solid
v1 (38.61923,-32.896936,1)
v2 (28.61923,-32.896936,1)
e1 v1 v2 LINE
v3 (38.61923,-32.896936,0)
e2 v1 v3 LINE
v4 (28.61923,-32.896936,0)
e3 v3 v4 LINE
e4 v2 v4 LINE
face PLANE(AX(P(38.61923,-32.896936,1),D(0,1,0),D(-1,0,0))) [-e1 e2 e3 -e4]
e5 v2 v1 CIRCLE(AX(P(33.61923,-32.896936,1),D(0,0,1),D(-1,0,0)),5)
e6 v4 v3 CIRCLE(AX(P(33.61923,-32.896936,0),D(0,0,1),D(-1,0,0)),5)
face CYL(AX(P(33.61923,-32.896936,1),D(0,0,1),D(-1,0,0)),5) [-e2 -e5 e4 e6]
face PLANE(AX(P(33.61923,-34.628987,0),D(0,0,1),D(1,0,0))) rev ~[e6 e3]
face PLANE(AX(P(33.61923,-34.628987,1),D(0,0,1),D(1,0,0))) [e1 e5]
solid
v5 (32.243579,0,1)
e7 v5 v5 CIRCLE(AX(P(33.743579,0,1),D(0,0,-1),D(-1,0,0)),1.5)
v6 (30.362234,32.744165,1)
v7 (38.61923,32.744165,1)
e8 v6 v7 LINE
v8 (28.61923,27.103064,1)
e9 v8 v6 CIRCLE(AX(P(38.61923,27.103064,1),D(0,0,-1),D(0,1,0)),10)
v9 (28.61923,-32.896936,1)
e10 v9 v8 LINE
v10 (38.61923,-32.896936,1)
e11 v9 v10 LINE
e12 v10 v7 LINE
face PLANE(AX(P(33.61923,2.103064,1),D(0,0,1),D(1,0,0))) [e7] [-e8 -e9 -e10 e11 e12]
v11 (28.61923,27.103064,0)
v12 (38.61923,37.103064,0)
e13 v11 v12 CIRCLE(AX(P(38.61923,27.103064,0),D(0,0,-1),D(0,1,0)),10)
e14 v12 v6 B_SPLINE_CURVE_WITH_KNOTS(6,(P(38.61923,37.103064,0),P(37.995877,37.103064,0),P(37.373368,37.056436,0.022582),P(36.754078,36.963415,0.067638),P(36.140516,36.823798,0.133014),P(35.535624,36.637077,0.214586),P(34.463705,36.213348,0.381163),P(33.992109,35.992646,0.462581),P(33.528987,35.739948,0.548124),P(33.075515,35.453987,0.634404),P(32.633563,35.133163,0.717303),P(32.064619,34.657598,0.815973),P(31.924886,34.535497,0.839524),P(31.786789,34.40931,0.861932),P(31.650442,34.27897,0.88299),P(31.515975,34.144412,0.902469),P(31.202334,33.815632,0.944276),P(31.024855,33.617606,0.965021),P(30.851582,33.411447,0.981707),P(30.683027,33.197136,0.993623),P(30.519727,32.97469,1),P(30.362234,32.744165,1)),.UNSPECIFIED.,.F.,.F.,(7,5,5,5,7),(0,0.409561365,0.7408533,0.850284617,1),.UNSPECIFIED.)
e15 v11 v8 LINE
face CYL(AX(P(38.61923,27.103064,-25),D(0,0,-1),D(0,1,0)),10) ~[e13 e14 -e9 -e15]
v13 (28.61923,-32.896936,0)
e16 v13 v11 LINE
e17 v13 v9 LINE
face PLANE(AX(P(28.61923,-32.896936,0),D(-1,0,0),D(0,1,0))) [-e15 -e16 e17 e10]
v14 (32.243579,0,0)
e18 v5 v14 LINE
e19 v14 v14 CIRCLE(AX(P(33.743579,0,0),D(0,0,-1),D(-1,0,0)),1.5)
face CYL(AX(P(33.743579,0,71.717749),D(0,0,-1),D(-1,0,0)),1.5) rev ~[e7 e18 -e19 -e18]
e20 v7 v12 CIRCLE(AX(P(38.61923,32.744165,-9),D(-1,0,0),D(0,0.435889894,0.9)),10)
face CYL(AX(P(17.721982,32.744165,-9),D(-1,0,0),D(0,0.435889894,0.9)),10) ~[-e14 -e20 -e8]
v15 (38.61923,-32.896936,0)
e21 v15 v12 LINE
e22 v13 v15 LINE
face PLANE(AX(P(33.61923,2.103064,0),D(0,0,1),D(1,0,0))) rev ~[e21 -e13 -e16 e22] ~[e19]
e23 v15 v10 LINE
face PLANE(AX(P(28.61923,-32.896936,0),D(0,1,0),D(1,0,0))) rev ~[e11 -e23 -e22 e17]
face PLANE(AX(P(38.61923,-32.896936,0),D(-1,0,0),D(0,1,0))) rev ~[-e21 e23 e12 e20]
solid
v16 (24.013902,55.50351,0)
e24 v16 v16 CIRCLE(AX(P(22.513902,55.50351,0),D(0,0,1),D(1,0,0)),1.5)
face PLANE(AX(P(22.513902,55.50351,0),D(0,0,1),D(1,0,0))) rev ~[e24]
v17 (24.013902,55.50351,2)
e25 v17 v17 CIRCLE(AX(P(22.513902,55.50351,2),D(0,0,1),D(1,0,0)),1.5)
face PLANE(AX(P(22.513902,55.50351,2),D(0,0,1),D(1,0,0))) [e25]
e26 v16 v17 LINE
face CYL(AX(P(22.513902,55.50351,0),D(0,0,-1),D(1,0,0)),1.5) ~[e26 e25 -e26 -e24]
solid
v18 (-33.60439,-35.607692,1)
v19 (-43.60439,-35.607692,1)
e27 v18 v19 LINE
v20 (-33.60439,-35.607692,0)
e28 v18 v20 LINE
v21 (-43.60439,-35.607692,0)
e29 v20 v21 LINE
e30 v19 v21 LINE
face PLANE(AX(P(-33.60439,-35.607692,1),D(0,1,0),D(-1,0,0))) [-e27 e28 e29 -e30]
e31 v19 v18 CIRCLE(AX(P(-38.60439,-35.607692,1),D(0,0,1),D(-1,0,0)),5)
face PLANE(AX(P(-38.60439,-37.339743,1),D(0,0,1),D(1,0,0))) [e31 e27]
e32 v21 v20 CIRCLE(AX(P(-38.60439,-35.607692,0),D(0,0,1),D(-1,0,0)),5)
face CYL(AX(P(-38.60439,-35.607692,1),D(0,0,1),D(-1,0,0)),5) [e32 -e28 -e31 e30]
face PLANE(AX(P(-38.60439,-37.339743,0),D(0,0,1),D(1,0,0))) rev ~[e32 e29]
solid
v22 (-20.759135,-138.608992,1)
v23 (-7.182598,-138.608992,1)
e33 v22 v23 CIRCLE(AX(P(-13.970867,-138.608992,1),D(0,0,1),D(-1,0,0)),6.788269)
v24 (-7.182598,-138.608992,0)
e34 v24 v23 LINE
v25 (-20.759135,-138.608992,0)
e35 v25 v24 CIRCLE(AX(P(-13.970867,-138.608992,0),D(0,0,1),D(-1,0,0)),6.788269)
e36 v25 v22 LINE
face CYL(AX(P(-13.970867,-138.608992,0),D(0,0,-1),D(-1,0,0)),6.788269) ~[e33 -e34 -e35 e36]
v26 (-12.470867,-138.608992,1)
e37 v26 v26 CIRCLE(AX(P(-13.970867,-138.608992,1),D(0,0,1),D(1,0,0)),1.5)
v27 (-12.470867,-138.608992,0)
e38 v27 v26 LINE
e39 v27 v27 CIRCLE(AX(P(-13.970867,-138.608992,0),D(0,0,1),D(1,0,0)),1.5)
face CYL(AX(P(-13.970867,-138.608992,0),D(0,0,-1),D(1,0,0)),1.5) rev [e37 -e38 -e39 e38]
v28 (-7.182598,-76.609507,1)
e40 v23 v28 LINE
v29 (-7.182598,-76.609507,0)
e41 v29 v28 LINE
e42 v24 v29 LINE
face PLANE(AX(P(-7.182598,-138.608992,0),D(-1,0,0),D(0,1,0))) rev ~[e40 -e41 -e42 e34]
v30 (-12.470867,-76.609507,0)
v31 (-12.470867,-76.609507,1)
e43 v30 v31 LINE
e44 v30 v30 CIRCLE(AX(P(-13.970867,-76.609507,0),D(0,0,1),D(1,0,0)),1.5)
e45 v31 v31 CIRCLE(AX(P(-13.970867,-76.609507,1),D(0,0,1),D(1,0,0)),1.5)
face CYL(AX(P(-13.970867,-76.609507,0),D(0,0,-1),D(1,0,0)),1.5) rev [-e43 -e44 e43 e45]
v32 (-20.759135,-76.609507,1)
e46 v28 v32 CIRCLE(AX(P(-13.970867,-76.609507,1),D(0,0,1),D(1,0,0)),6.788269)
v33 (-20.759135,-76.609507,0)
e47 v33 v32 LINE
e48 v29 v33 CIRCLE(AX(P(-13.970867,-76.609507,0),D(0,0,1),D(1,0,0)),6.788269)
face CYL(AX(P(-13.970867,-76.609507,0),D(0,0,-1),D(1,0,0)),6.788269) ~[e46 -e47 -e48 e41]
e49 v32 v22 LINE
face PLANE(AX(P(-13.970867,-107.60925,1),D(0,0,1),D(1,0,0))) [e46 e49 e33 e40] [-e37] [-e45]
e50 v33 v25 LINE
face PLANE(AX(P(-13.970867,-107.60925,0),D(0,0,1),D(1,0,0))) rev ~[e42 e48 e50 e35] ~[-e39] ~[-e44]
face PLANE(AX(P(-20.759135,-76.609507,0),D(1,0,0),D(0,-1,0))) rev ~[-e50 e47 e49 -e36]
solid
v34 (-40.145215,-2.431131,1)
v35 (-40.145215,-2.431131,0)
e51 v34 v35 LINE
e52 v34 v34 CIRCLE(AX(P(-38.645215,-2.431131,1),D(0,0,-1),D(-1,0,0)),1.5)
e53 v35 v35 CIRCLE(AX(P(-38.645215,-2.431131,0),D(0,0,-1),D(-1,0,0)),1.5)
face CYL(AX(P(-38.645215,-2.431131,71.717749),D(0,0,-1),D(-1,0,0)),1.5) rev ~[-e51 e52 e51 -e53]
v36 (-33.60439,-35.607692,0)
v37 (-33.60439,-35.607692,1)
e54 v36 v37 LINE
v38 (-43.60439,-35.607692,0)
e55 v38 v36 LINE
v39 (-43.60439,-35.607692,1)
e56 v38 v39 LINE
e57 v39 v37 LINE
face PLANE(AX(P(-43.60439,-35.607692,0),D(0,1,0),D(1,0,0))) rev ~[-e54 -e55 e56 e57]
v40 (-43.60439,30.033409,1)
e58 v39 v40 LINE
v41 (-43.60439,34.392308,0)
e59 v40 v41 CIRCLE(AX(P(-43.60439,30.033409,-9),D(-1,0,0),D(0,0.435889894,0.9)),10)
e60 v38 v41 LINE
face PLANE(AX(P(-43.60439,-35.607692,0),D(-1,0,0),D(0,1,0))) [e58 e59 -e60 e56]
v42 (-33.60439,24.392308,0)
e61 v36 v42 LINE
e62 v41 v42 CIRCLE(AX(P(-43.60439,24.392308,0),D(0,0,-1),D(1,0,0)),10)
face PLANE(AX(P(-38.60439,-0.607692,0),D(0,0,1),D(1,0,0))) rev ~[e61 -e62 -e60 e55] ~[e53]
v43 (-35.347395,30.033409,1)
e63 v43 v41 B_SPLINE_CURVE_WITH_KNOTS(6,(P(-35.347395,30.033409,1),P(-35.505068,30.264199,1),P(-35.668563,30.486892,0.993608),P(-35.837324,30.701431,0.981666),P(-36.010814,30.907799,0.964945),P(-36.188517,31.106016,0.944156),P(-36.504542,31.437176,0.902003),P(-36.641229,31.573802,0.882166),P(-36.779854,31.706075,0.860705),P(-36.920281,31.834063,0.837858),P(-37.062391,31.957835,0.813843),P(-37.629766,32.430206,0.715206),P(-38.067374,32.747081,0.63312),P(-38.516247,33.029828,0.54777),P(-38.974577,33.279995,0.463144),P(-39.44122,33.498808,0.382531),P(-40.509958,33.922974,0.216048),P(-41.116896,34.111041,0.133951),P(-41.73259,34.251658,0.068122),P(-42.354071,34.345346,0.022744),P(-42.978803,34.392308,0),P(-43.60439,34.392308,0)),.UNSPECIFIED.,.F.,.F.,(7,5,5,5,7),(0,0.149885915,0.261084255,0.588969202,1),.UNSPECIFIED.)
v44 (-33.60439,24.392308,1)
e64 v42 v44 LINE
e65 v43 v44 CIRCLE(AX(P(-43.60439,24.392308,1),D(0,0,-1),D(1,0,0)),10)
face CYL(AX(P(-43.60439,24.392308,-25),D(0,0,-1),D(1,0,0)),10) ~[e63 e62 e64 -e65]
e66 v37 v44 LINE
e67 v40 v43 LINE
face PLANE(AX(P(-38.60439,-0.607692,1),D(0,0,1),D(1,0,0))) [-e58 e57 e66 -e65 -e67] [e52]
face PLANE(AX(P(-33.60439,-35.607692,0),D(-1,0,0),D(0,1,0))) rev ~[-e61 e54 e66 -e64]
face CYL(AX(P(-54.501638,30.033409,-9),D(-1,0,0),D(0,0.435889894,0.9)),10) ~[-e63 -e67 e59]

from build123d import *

# Parameters (mm, degrees)
F0_W        = 10
F0_H        = 70
F1_DEPTH    = 1
F2_T1_DEPTH = 51
F2_T3_DEPTH = 31.7944947177
F3_W        = 10
F3_H        = 70
F4_DEPTH    = 1
F5_T1_DEPTH = 51
F5_T3_DEPTH = 31.7944947177
F7_D        = 3
F10_D       = 3
F11_R       = 1.5
F12_DEPTH   = 2
F13_R       = 1.5
F14_DEPTH   = 1
F15_DEPTH   = 1
F16_DEPTH   = 1


# Not quite as in the source:
# - a fillet or chamfer that OpenCascade refuses, or shapes differently, is made with other operations: its cross-section is extruded or revolved along the edge and cut away or added


with BuildPart() as f1:
    # F0 (on Top) → F1 (new body)
    with BuildSketch(Plane.XY):
        with Locations((-38.6043904229, -0.6076917052)):
            Rectangle(F0_W, F0_H)
    extrude(amount=F1_DEPTH)

    # F2: fillet of radius 10 on 2 edges, made by hand

    # F2_s2 → F2_t1 (cut)
    with BuildSketch(Plane.XY.offset(-25)):
        with BuildLine():
            ThreePointArc((-33.6043904229, 24.3923082948), (-36.5333226111, 31.4633761066), (-43.6043904229, 34.3923082948))
            Line((-43.6043904229, 34.3923082948), (-33.6043904229, 34.3923082948))
            Line((-33.6043904229, 34.3923082948), (-33.6043904229, 24.3923082948))
        make_face()
    extrude(amount=F2_T1_DEPTH, mode=Mode.SUBTRACT)

    # F2_s4 → F2_t3 (cut)
    with BuildSketch(Plane.YZ.offset(-54.5016377818)):
        with BuildLine():
            ThreePointArc((34.3923082948, 0), (32.2694773287, 0.7467943448), (30.0334093512, 1))
            Line((30.0334093512, 1), (34.3923082948, 1))
            Line((34.3923082948, 1), (34.3923082948, 0))
        make_face()
    extrude(amount=F2_T3_DEPTH, mode=Mode.SUBTRACT)

    # F10 (through all)
    with Locations(Plane.XY.offset(1)):
        with Locations((-38.6452153325, -2.4311314337)):
            Hole(F10_D / 2)


with BuildPart() as f4:
    # F3 (on Top) → F4 (new body)
    with BuildSketch(Plane.XY):
        with Locations((33.6192296806, 2.1030642092)):
            Rectangle(F3_W, F3_H)
    extrude(amount=F4_DEPTH)

    # F5: fillet of radius 10 on 2 edges, made by hand

    # F5_s2 → F5_t1 (cut)
    with BuildSketch(Plane.XY.offset(-25)):
        with BuildLine():
            ThreePointArc((38.6192296806, 37.1030642092), (31.5481618688, 34.1741320211), (28.6192296806, 27.1030642092))
            Line((28.6192296806, 27.1030642092), (28.6192296806, 37.1030642092))
            Line((28.6192296806, 37.1030642092), (38.6192296806, 37.1030642092))
        make_face()
    extrude(amount=F5_T1_DEPTH, mode=Mode.SUBTRACT)

    # F5_s4 → F5_t3 (cut)
    with BuildSketch(Plane.YZ.offset(17.7219823218)):
        with BuildLine():
            ThreePointArc((37.1030642092, 0), (34.9802332432, 0.7467943448), (32.7441652657, 1))
            Line((32.7441652657, 1), (37.1030642092, 1))
            Line((37.1030642092, 1), (37.1030642092, 0))
        make_face()
    extrude(amount=F5_T3_DEPTH, mode=Mode.SUBTRACT)

    # F7 (through all)
    with Locations(Plane.XY.offset(1)):
        with Locations((33.7435789406, 0)):
            Hole(F7_D / 2)


with BuildPart() as f12:
    # F11 (on Top) → F12 (new body)
    with BuildSketch(Plane.XY):
        with Locations((22.5139018148, 55.5035099387)):
            Circle(F11_R)
    extrude(amount=F12_DEPTH)


with BuildPart() as f14:
    # F13 (on Top) → F14 (new body)
    with BuildSketch(Plane.XY):
        with BuildLine():
            ThreePointArc((-7.182598114, -76.6095072031), (-13.9708667994, -69.8212385178), (-20.7591354847, -76.6095072031))
            Line((-20.7591354847, -76.6095072031), (-20.7591354847, -138.6089920998))
            ThreePointArc((-20.7591354847, -138.6089920998), (-13.9708667994, -145.3972607851), (-7.182598114, -138.6089920998))
            Line((-7.182598114, -138.6089920998), (-7.182598114, -76.6095072031))
        make_face()
        with Locations((-13.9708667994, -138.6089920998)):
            Circle(F13_R, mode=Mode.SUBTRACT)
        with Locations((-13.9708667994, -76.6095072031)):
            Circle(F13_R, mode=Mode.SUBTRACT)
    extrude(amount=F14_DEPTH)


with BuildPart() as f15:
    # F6 (on face) → F15 (new body)
    with BuildSketch(Plane.XY.offset(1)):
        with BuildLine():
            Line((38.6192296806, -32.8969357908), (28.6192296806, -32.8969357908))
            ThreePointArc((28.6192296806, -32.8969357908), (33.6192296806, -37.8969357908), (38.6192296806, -32.8969357908))
        make_face()
    extrude(amount=-F15_DEPTH)


with BuildPart() as f16:
    # F8 (on face) → F16 (new body)
    with BuildSketch(Plane.XY.offset(1)):
        with BuildLine():
            ThreePointArc((-43.6043904229, -35.6076917052), (-38.6043904229, -40.6076917052), (-33.6043904229, -35.6076917052))
            Line((-33.6043904229, -35.6076917052), (-43.6043904229, -35.6076917052))
        make_face()
    extrude(amount=-F16_DEPTH)


solid = Compound([f1.part, f4.part, f12.part, f14.part, f15.part, f16.part])
